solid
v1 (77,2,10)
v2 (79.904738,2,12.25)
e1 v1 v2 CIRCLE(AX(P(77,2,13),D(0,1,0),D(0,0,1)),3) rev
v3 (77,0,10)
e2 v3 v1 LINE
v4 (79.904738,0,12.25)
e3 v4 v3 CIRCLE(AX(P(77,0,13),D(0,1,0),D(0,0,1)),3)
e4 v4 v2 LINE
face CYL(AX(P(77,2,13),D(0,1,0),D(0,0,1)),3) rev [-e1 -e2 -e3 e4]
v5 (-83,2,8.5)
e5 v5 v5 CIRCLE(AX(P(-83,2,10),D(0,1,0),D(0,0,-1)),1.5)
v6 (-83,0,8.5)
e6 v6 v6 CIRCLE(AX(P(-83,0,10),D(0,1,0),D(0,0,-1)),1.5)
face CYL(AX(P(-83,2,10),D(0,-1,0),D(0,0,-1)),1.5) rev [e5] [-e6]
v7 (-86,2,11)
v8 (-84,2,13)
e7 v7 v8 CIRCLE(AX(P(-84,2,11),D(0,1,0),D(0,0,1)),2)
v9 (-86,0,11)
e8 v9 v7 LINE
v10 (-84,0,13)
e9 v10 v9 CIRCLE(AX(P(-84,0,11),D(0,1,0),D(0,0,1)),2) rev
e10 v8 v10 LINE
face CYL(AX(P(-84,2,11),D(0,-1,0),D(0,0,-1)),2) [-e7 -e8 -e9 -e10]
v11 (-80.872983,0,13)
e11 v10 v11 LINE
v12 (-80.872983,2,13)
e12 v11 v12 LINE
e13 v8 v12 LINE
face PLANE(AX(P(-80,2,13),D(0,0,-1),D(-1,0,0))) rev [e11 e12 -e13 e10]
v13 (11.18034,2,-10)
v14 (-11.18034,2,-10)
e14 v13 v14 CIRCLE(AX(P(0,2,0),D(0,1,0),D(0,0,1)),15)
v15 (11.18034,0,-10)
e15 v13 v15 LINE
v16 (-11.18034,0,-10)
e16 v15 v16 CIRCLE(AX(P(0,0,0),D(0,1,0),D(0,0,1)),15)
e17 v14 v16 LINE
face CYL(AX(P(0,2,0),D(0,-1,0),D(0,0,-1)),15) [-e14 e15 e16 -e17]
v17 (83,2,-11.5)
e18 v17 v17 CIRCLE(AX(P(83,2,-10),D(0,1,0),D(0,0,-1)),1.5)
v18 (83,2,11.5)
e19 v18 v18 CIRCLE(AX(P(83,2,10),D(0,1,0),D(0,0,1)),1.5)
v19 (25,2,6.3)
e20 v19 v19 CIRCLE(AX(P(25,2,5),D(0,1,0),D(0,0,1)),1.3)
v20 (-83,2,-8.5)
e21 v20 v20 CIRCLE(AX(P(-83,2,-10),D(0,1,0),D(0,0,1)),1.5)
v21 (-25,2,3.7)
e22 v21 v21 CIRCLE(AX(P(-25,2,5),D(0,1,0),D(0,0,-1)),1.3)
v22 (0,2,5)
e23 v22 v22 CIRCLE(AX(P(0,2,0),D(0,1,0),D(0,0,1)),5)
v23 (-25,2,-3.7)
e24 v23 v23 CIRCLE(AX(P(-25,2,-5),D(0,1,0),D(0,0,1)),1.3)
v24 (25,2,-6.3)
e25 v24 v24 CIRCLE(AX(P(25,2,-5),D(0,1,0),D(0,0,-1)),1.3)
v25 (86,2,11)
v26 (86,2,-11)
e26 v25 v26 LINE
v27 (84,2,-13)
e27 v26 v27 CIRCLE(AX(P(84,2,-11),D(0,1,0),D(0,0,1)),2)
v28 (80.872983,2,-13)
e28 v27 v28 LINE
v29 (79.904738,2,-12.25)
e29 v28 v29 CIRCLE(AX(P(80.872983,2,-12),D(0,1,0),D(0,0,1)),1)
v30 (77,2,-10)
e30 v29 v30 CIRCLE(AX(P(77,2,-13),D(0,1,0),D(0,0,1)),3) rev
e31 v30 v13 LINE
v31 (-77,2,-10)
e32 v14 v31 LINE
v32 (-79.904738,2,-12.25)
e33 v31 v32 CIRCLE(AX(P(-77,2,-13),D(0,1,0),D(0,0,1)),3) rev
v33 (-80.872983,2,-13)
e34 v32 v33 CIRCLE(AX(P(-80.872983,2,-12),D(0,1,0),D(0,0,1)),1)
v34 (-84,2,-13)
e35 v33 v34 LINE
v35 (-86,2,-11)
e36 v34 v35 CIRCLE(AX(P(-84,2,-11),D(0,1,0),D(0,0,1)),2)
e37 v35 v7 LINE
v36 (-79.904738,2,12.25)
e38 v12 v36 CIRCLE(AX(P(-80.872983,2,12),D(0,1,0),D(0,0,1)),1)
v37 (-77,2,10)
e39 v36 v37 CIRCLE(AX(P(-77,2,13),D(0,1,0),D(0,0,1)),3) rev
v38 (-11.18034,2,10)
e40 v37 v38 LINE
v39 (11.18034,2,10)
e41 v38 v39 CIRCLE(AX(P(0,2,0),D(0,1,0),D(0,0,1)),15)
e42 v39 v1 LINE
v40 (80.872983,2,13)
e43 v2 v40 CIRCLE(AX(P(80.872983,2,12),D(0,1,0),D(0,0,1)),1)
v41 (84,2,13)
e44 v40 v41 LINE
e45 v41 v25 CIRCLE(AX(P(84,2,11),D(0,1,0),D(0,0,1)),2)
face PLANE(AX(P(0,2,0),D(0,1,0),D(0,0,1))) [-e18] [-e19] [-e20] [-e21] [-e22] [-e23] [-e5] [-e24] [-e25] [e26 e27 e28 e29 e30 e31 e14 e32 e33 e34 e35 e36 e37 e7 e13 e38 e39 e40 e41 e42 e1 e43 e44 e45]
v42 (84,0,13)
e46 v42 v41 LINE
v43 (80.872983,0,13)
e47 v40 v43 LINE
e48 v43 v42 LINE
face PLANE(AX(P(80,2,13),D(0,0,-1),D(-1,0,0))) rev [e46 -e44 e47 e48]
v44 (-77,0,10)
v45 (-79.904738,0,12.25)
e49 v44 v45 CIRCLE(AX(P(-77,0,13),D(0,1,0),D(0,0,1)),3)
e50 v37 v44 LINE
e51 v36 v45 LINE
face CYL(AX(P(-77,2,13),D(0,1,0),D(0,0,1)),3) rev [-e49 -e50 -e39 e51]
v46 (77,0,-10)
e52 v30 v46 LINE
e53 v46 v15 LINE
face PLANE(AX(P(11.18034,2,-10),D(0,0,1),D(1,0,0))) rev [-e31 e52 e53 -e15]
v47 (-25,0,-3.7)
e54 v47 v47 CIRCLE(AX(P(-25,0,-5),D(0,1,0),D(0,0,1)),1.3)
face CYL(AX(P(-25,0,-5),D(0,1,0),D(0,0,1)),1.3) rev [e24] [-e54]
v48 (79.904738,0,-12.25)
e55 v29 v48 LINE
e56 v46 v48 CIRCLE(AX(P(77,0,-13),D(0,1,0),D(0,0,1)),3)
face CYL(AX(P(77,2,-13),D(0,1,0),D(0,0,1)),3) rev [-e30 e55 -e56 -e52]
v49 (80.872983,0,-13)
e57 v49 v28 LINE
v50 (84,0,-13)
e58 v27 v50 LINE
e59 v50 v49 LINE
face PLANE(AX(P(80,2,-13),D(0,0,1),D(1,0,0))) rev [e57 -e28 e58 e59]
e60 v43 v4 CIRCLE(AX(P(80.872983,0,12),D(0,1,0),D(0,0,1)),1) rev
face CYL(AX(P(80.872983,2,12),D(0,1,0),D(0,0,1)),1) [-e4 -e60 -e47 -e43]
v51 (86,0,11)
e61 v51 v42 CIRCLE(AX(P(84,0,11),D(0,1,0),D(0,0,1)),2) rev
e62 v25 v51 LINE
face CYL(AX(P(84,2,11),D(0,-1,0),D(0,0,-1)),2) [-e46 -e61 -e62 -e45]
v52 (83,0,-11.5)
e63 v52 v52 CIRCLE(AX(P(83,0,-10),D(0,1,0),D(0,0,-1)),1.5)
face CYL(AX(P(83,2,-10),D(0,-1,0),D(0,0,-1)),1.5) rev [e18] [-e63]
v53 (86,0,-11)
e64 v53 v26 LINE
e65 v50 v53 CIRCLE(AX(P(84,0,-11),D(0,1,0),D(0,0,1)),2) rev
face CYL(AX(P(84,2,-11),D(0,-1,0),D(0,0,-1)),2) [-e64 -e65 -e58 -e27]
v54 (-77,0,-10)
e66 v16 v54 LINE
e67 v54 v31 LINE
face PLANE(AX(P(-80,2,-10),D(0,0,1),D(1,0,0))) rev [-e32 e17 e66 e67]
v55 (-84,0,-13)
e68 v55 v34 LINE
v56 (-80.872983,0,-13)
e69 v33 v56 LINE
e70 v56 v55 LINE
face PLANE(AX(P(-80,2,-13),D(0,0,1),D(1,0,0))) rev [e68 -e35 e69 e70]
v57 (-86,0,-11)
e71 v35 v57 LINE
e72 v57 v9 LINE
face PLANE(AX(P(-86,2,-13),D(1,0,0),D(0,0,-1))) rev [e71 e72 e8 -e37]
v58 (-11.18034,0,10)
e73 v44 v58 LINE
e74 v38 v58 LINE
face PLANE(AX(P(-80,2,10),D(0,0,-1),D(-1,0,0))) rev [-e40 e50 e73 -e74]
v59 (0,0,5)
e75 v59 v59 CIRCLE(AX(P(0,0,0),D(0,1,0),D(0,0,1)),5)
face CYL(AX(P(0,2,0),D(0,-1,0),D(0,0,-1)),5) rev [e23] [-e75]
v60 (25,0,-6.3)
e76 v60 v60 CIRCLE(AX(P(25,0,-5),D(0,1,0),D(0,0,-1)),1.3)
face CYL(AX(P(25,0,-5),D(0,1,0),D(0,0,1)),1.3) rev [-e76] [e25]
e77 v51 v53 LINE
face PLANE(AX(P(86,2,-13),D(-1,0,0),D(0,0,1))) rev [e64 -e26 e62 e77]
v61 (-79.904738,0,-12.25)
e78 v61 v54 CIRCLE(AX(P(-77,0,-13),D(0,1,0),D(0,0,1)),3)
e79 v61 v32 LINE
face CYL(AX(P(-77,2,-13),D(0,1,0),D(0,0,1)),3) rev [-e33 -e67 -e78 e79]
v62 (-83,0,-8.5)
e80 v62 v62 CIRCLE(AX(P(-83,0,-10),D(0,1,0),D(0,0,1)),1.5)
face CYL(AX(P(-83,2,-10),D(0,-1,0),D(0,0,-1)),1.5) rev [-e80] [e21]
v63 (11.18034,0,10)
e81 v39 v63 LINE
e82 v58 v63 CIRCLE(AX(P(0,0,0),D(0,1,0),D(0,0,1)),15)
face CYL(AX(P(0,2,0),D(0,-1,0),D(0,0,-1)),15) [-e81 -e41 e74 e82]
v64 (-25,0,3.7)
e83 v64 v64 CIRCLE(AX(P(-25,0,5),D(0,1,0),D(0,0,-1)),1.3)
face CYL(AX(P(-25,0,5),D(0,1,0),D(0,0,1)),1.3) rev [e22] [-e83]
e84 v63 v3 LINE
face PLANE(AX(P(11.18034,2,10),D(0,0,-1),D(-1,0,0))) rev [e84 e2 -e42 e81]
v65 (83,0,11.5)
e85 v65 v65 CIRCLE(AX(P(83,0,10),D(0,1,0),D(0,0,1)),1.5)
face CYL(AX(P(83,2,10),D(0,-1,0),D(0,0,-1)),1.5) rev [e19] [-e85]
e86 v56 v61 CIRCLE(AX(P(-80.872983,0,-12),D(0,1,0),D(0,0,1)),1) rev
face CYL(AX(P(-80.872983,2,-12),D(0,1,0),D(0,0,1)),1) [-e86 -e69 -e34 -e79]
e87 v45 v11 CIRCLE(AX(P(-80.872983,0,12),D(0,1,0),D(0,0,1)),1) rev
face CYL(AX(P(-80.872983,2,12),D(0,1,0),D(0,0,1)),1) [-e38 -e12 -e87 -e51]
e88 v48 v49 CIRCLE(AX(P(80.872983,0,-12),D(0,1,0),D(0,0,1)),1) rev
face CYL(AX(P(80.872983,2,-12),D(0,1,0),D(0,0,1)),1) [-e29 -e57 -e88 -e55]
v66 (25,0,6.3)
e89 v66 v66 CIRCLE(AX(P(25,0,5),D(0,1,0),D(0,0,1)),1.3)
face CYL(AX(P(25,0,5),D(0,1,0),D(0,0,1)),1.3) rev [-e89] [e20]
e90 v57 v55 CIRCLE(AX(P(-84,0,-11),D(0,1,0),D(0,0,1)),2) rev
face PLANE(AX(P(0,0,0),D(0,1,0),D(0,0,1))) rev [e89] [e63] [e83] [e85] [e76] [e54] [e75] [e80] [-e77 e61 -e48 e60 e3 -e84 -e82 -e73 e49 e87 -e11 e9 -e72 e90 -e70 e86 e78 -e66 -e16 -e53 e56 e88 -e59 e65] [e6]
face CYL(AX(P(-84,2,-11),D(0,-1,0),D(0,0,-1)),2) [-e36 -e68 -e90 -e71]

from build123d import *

# Parameters (mm, degrees)
SKETCH_1_R          = 5
EXTRUDE_1_DEPTH     = 2
SKETCH_2_R          = 1.3
CUT_EXTRUDE_1_DEPTH = 2
SKETCH_3_W          = 6
SKETCH_3_H          = 26
SKETCH_3_R          = 1.5
EXTRUDE_2_DEPTH     = 2
FILLET_1_R          = 3
FILLET_2_R          = 2
FILLET_3_R          = 1


with BuildPart() as part:
    # 草图1 → 凸台-拉伸1 (new body)
    with BuildSketch(Plane(origin=(0, 0, 0), x_dir=(1, 0, 0), z_dir=(0, 1, 0))):
        with BuildLine():
            Line((11.180339887, 10), (80, 10))
            Line((80, 10), (80, -10))
            Line((80, -10), (11.180339887, -10))
            ThreePointArc((11.180339887, -10), (0, -15), (-11.180339887, -10))
            Line((-11.180339887, -10), (-80, -10))
            Line((-80, -10), (-80, 10))
            Line((-80, 10), (-11.180339887, 10))
            ThreePointArc((-11.180339887, 10), (0, 15), (11.180339887, 10))
        make_face()
        with Locations(Location((0, 0, 0), (0, 0, 270))):
            Circle(SKETCH_1_R, mode=Mode.SUBTRACT)
    extrude(amount=EXTRUDE_1_DEPTH)

    # 草图2 → 切除-拉伸1 (cut)
    with BuildSketch(Plane(origin=(0, 2, 0), x_dir=(1, 0, 0), z_dir=(0, 1, 0))):
        with Locations(Location((-25, 5, 0), (0, 0, 270))):
            Circle(SKETCH_2_R)
        with Locations(Location((-25, -5, 0), (0, 0, 90))):
            Circle(SKETCH_2_R)
        with Locations(Location((25, -5, 0), (0, 0, 270))):
            Circle(SKETCH_2_R)
        with Locations(Location((25, 5, 0), (0, 0, 90))):
            Circle(SKETCH_2_R)
    extrude(amount=-CUT_EXTRUDE_1_DEPTH, mode=Mode.SUBTRACT)

    # 草图3 → 凸台-拉伸2 (add)
    # profile 1 of 2: a face of its own
    with BuildSketch(Plane(origin=(0, 0, 0), x_dir=(1, 0, 0), z_dir=(0, 1, 0))):
        with Locations((-83, 0)):
            Rectangle(SKETCH_3_W, SKETCH_3_H)
        with Locations(Location((-83, 10, 0), (0, 0, 270))):
            Circle(SKETCH_3_R, mode=Mode.SUBTRACT)
        with Locations(Location((-83, -10, 0), (0, 0, 90))):
            Circle(SKETCH_3_R, mode=Mode.SUBTRACT)
    # profile 2 of 2: a face of its own
    with BuildSketch(Plane(origin=(0, 0, 0), x_dir=(1, 0, 0), z_dir=(0, 1, 0))):
        with Locations((83, 0)):
            Rectangle(SKETCH_3_W, SKETCH_3_H)
        with Locations(Location((83, -10, 0), (0, 0, 270))):
            Circle(SKETCH_3_R, mode=Mode.SUBTRACT)
        with Locations(Location((83, 10, 0), (0, 0, 90))):
            Circle(SKETCH_3_R, mode=Mode.SUBTRACT)
    extrude(amount=EXTRUDE_2_DEPTH)

    # 圆角1
    fillet_1_edges = [part.edges().sort_by_distance(p)[0] for p in [
        (80, 1, 10),
        (80, 1, -10),
        (-80, 1, -10),
        (-80, 1, 10),
    ]]
    fillet(fillet_1_edges, radius=FILLET_1_R - 0.0001)  # a hair under: the kernel refuses the full size

    # 圆角2
    fillet_2_edges = [part.edges().sort_by_distance(p)[0] for p in [
        (-86, 1, 13),
        (-86, 1, -13),
        (86, 1, 13),
        (86, 1, -13),
    ]]
    fillet(fillet_2_edges, radius=FILLET_2_R)

    # 圆角3
    fillet_3_edges = [part.edges().sort_by_distance(p)[0] for p in [
        (-80, 1, 13),
        (-80, 1, -13),
        (80, 1, -13),
        (80, 1, 13),
    ]]
    fillet(fillet_3_edges, radius=FILLET_3_R)


solid = part.part
